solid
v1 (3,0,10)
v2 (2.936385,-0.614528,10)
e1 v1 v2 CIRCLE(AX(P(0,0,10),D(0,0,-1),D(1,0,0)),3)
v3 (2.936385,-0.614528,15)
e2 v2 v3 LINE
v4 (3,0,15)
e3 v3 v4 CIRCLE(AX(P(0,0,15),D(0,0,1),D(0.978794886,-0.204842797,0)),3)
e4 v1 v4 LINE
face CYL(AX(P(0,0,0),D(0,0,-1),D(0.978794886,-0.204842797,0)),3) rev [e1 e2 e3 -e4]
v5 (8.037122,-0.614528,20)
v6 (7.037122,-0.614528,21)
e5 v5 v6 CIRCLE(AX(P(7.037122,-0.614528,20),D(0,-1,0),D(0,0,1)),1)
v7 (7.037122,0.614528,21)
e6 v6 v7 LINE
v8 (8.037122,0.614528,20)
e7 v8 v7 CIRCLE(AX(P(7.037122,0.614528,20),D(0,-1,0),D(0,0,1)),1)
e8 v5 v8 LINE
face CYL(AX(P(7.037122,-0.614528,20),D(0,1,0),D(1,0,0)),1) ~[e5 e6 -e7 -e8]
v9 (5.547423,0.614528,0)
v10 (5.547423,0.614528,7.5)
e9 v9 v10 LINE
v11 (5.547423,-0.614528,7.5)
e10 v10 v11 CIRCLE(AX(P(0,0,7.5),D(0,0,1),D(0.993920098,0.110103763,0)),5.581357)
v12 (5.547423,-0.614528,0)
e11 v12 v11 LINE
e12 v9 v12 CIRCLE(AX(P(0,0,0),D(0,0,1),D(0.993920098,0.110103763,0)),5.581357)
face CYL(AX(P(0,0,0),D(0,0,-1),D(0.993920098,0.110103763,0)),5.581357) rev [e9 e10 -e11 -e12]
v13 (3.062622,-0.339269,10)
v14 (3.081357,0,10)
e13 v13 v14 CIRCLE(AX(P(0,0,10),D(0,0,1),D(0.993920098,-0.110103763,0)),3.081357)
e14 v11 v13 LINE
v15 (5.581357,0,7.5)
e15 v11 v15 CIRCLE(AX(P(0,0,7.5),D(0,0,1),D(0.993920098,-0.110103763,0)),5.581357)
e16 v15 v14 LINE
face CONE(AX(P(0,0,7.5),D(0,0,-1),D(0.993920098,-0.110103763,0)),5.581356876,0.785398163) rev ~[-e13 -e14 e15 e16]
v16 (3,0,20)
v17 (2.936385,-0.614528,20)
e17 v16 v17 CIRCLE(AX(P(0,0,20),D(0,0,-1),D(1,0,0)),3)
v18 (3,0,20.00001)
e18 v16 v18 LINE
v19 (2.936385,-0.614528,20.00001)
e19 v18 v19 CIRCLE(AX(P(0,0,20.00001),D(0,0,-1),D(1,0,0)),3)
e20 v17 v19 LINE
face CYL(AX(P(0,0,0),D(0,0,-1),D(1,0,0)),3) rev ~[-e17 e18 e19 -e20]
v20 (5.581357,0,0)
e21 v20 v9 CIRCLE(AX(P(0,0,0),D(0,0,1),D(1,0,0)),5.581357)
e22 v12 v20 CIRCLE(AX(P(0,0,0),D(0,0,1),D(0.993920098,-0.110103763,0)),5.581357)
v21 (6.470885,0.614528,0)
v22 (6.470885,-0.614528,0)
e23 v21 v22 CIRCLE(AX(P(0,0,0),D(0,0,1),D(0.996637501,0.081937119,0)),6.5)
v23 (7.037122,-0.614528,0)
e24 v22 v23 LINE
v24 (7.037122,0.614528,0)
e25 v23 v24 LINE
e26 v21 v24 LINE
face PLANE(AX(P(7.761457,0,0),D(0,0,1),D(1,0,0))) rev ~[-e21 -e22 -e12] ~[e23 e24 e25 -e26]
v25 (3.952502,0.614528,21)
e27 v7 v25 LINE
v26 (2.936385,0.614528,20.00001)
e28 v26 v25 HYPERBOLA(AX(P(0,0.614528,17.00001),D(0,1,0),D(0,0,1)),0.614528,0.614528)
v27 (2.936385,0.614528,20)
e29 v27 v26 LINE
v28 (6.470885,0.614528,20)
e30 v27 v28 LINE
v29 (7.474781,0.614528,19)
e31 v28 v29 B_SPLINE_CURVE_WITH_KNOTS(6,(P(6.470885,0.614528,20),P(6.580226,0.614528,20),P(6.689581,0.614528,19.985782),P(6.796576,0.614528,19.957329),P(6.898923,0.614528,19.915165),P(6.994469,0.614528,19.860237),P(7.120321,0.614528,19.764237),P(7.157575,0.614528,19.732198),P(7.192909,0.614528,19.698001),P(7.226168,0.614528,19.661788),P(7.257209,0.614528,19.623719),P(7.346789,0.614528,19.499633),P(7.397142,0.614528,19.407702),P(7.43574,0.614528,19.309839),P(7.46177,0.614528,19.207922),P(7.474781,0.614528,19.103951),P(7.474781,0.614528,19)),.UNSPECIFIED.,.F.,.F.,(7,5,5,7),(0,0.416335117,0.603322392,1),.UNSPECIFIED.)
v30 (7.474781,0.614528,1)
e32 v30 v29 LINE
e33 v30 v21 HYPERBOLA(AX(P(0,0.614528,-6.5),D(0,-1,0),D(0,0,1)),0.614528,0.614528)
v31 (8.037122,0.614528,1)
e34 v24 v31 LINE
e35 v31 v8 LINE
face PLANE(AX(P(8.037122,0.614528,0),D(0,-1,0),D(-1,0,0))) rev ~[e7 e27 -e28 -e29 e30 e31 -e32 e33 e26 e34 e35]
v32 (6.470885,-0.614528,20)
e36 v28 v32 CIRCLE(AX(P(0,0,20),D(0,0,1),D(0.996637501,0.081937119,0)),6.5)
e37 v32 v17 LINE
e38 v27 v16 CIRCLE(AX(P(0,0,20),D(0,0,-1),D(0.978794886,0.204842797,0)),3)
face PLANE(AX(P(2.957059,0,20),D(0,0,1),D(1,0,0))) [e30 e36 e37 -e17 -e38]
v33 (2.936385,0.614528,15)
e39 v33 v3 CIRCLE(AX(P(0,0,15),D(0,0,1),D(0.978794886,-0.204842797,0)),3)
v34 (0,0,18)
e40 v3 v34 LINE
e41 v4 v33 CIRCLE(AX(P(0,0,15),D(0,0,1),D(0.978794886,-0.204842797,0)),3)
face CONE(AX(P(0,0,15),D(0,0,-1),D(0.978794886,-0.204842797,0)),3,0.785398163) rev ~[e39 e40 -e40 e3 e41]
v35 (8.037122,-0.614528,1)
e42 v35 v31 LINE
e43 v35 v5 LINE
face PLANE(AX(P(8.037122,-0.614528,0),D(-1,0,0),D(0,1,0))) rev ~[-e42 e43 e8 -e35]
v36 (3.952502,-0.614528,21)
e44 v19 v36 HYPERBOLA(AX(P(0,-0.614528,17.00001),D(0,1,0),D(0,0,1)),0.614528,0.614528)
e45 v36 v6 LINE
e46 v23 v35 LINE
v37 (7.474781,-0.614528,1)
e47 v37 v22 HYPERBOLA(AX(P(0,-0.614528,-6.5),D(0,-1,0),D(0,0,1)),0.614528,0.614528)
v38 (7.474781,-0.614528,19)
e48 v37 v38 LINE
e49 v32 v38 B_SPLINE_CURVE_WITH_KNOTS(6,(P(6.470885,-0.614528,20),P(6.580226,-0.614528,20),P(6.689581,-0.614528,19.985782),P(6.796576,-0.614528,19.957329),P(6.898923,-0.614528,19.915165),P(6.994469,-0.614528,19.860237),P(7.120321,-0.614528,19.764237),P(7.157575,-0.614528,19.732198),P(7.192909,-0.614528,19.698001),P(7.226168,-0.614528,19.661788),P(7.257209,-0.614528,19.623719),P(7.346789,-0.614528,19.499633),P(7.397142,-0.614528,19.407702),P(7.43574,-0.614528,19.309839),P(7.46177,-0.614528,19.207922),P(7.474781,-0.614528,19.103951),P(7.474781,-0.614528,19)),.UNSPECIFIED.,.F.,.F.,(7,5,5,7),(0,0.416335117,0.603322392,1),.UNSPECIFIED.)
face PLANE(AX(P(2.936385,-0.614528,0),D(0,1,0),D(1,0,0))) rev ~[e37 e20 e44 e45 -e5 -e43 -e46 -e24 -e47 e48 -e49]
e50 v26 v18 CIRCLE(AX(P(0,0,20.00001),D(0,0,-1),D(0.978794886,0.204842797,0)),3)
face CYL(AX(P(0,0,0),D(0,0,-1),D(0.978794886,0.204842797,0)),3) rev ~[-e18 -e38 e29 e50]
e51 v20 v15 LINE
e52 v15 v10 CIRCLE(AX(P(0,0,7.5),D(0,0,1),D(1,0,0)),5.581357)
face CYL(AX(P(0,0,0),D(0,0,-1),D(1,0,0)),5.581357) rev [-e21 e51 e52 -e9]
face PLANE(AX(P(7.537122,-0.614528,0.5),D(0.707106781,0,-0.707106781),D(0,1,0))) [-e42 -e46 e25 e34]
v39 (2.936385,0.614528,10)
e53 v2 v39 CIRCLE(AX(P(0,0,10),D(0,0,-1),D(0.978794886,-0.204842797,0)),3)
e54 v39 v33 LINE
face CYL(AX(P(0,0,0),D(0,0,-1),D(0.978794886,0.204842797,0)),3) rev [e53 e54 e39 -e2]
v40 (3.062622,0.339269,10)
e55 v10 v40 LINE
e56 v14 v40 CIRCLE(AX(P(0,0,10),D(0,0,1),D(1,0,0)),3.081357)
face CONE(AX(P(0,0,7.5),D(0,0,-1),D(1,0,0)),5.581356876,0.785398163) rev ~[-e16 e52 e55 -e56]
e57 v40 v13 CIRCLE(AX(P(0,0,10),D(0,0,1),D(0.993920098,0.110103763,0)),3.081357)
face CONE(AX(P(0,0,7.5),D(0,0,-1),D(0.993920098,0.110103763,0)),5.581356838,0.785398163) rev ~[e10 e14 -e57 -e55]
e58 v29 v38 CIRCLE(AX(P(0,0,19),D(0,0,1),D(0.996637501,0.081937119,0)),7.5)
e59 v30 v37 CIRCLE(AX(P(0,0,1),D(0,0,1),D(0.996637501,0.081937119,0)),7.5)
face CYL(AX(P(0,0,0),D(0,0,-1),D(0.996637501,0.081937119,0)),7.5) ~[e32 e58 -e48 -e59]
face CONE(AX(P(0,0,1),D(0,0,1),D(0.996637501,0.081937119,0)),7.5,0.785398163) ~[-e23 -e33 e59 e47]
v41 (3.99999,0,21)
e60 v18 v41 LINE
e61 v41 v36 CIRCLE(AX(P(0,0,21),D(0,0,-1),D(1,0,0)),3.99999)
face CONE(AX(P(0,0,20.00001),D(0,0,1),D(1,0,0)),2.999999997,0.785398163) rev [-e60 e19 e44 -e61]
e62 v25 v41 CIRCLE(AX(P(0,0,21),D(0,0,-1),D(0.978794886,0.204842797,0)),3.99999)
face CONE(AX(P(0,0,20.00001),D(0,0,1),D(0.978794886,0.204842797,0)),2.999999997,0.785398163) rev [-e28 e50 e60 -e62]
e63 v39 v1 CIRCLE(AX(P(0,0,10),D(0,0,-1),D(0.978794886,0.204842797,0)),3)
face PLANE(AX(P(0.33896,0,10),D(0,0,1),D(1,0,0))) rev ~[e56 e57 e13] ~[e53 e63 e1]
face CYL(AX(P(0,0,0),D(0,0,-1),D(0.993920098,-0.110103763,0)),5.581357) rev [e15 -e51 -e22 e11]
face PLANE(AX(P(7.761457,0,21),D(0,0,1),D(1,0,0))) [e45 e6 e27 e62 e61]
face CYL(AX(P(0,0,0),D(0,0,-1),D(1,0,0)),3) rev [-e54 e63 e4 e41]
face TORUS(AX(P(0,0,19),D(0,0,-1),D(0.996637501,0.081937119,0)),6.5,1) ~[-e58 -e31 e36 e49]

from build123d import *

# Parameters (mm, degrees)
F1_DEPTH = 20
F2_DEPTH = 21
F3_DEPTH = 18
F4_DEPTH = 10
F10_R    = 1
F6_SIZE  = 0.99999
F7_SIZE  = 1
F8_SIZE  = 1
F9_SIZE  = 2.5


# Not quite as in the source:
# - a fillet or chamfer that OpenCascade refuses, or shapes differently, is made with other operations: its cross-section is extruded or revolved along the edge and cut away or added
# - a fillet or chamfer is up to 0.001 mm smaller than in the source, because OpenCascade refuses the exact size


with BuildPart() as f1:
    # F0 (on Top) → F1 (new body)
    with BuildSketch(Plane.XY):
        with BuildLine():
            ThreePointArc((3, 0), (2.9840537841, 0.308906157), (2.9363846575, 0.6145283911))
            Line((2.9363846575, 0.6145283911), (2.9363846575, -0.6145283911))
            ThreePointArc((2.9363846575, -0.6145283911), (2.9840537841, -0.308906157), (3, 0))
        make_face()
        with BuildLine():
            Line((5.5474227354, 0.6145283911), (7.4747812581, 0.6145283911))
            ThreePointArc((7.4747812581, 0.6145283911), (-7.5, 0), (7.4747812581, -0.6145283911))
            Line((7.4747812581, -0.6145283911), (5.5474227354, -0.6145283911))
            ThreePointArc((5.5474227354, -0.6145283911), (-5.5813568376, 0), (5.5474227354, 0.6145283911))
        make_face()
        with BuildLine():
            Line((2.9363846575, 0.6145283911), (5.5474227354, 0.6145283911))
            ThreePointArc((5.5474227354, 0.6145283911), (-5.5813568376, 0), (5.5474227354, -0.6145283911))
            Line((5.5474227354, -0.6145283911), (2.9363846575, -0.6145283911))
            ThreePointArc((2.9363846575, -0.6145283911), (-3, 0), (2.9363846575, 0.6145283911))
        make_face()
        with BuildLine():
            Line((2.9363846575, -0.6145283911), (2.9363846575, 0.6145283911))
            ThreePointArc((2.9363846575, 0.6145283911), (-3, 0), (2.9363846575, -0.6145283911))
        make_face()
        with BuildLine():
            ThreePointArc((7.4747812581, -0.6145283911), (7.4936926624, -0.3075228156), (7.5, 0))
            ThreePointArc((7.5, 0), (7.4936926624, 0.3075228156), (7.4747812581, 0.6145283911))
            Line((7.4747812581, 0.6145283911), (5.5474227354, 0.6145283911))
            ThreePointArc((5.5474227354, 0.6145283911), (5.5728668548, 0.3077322971), (5.5813568376, 0))
            ThreePointArc((5.5813568376, 0), (5.5728668548, -0.3077322971), (5.5474227354, -0.6145283911))
            Line((5.5474227354, -0.6145283911), (7.4747812581, -0.6145283911))
        make_face()
        with BuildLine():
            ThreePointArc((5.5813568376, 0), (5.5728668548, 0.3077322971), (5.5474227354, 0.6145283911))
            Line((5.5474227354, 0.6145283911), (2.9363846575, 0.6145283911))
            ThreePointArc((2.9363846575, 0.6145283911), (2.9840537841, 0.308906157), (3, 0))
            ThreePointArc((3, 0), (2.9840537841, -0.308906157), (2.9363846575, -0.6145283911))
            Line((2.9363846575, -0.6145283911), (5.5474227354, -0.6145283911))
            ThreePointArc((5.5474227354, -0.6145283911), (5.5728668548, -0.3077322971), (5.5813568376, 0))
        make_face()
    extrude(amount=F1_DEPTH)

    # F0 (on Top) → F2 (join)
    with BuildSketch(Plane.XY):
        with BuildLine():
            ThreePointArc((7.4747812581, 0.6145283911), (7.4936926624, 0.3075228156), (7.5, 0))
            ThreePointArc((7.5, 0), (7.4936926624, -0.3075228156), (7.4747812581, -0.6145283911))
            Line((7.4747812581, -0.6145283911), (8.0371221235, -0.6145283911))
            Line((8.0371221235, -0.6145283911), (8.0371221235, 0.6145283911))
            Line((8.0371221235, 0.6145283911), (7.4747812581, 0.6145283911))
        make_face()
        with BuildLine():
            ThreePointArc((7.4747812581, -0.6145283911), (7.4936926624, -0.3075228156), (7.5, 0))
            ThreePointArc((7.5, 0), (7.4936926624, 0.3075228156), (7.4747812581, 0.6145283911))
            Line((7.4747812581, 0.6145283911), (5.5474227354, 0.6145283911))
            ThreePointArc((5.5474227354, 0.6145283911), (5.5728668548, 0.3077322971), (5.5813568376, 0))
            ThreePointArc((5.5813568376, 0), (5.5728668548, -0.3077322971), (5.5474227354, -0.6145283911))
            Line((5.5474227354, -0.6145283911), (7.4747812581, -0.6145283911))
        make_face()
        with BuildLine():
            ThreePointArc((5.5813568376, 0), (5.5728668548, 0.3077322971), (5.5474227354, 0.6145283911))
            Line((5.5474227354, 0.6145283911), (2.9363846575, 0.6145283911))
            ThreePointArc((2.9363846575, 0.6145283911), (2.9840537841, 0.308906157), (3, 0))
            ThreePointArc((3, 0), (2.9840537841, -0.308906157), (2.9363846575, -0.6145283911))
            Line((2.9363846575, -0.6145283911), (5.5474227354, -0.6145283911))
            ThreePointArc((5.5474227354, -0.6145283911), (5.5728668548, -0.3077322971), (5.5813568376, 0))
        make_face()
    extrude(amount=F2_DEPTH)

    # F0 (on Top) → F3 (cut)
    with BuildSketch(Plane.XY):
        with BuildLine():
            Line((2.9363846575, -0.6145283911), (2.9363846575, 0.6145283911))
            ThreePointArc((2.9363846575, 0.6145283911), (-3, 0), (2.9363846575, -0.6145283911))
        make_face()
        with BuildLine():
            ThreePointArc((3, 0), (2.9840537841, 0.308906157), (2.9363846575, 0.6145283911))
            Line((2.9363846575, 0.6145283911), (2.9363846575, -0.6145283911))
            ThreePointArc((2.9363846575, -0.6145283911), (2.9840537841, -0.308906157), (3, 0))
        make_face()
    extrude(amount=F3_DEPTH, mode=Mode.SUBTRACT)

    # F0 (on Top) → F4 (cut)
    with BuildSketch(Plane.XY):
        with BuildLine():
            Line((2.9363846575, 0.6145283911), (5.5474227354, 0.6145283911))
            ThreePointArc((5.5474227354, 0.6145283911), (-5.5813568376, 0), (5.5474227354, -0.6145283911))
            Line((5.5474227354, -0.6145283911), (2.9363846575, -0.6145283911))
            ThreePointArc((2.9363846575, -0.6145283911), (-3, 0), (2.9363846575, 0.6145283911))
        make_face()
        with BuildLine():
            ThreePointArc((5.5813568376, 0), (5.5728668548, 0.3077322971), (5.5474227354, 0.6145283911))
            Line((5.5474227354, 0.6145283911), (2.9363846575, 0.6145283911))
            ThreePointArc((2.9363846575, 0.6145283911), (2.9840537841, 0.308906157), (3, 0))
            ThreePointArc((3, 0), (2.9840537841, -0.308906157), (2.9363846575, -0.6145283911))
            Line((2.9363846575, -0.6145283911), (5.5474227354, -0.6145283911))
            ThreePointArc((5.5474227354, -0.6145283911), (5.5728668548, -0.3077322971), (5.5813568376, 0))
        make_face()
    extrude(amount=F4_DEPTH, mode=Mode.SUBTRACT)

    # F10
    f10_edges = [f1.edges().sort_by_distance(p)[0] for p in [
        (-7.5, 0, 20),
        (8.037122, 0, 21),
    ]]
    fillet(f10_edges, radius=F10_R)

    # F5: chamfer of 3 on 1 edges, made by hand

    # F5_s1 → F5_t2 (revolve)
    with BuildSketch(Plane(origin=(0, 0, 0), x_dir=(0, 0, 1), z_dir=(-0.204842797, -0.9787948858, 0))):
        Polygon((15, -3), (18, 0), (18, -3), align=None)
    revolve(axis=Axis((0, 0, 18), (0, 0, 1)))

    # F6 (size 1 in the source; OpenCascade refuses exactly that, so slightly less here)
    f6_edges = [f1.edges().sort_by_distance(p)[0] for p in [
        (3, 0, 21),
    ]]
    chamfer(f6_edges, length=F6_SIZE)

    # F7
    f7_edges = [f1.edges().sort_by_distance(p)[0] for p in [
        (-7.5, 0, 0),
    ]]
    chamfer(f7_edges, length=F7_SIZE)

    # F8
    f8_edges = [f1.edges().sort_by_distance(p)[0] for p in [
        (8.037122, 0, 0),
    ]]
    chamfer(f8_edges, length=F8_SIZE)

    # F9
    f9_edges = [f1.edges().sort_by_distance(p)[0] for p in [
        (-5.547423, 0.614528, 10),
    ]]
    chamfer(f9_edges, length=F9_SIZE)


solid = f1.part
